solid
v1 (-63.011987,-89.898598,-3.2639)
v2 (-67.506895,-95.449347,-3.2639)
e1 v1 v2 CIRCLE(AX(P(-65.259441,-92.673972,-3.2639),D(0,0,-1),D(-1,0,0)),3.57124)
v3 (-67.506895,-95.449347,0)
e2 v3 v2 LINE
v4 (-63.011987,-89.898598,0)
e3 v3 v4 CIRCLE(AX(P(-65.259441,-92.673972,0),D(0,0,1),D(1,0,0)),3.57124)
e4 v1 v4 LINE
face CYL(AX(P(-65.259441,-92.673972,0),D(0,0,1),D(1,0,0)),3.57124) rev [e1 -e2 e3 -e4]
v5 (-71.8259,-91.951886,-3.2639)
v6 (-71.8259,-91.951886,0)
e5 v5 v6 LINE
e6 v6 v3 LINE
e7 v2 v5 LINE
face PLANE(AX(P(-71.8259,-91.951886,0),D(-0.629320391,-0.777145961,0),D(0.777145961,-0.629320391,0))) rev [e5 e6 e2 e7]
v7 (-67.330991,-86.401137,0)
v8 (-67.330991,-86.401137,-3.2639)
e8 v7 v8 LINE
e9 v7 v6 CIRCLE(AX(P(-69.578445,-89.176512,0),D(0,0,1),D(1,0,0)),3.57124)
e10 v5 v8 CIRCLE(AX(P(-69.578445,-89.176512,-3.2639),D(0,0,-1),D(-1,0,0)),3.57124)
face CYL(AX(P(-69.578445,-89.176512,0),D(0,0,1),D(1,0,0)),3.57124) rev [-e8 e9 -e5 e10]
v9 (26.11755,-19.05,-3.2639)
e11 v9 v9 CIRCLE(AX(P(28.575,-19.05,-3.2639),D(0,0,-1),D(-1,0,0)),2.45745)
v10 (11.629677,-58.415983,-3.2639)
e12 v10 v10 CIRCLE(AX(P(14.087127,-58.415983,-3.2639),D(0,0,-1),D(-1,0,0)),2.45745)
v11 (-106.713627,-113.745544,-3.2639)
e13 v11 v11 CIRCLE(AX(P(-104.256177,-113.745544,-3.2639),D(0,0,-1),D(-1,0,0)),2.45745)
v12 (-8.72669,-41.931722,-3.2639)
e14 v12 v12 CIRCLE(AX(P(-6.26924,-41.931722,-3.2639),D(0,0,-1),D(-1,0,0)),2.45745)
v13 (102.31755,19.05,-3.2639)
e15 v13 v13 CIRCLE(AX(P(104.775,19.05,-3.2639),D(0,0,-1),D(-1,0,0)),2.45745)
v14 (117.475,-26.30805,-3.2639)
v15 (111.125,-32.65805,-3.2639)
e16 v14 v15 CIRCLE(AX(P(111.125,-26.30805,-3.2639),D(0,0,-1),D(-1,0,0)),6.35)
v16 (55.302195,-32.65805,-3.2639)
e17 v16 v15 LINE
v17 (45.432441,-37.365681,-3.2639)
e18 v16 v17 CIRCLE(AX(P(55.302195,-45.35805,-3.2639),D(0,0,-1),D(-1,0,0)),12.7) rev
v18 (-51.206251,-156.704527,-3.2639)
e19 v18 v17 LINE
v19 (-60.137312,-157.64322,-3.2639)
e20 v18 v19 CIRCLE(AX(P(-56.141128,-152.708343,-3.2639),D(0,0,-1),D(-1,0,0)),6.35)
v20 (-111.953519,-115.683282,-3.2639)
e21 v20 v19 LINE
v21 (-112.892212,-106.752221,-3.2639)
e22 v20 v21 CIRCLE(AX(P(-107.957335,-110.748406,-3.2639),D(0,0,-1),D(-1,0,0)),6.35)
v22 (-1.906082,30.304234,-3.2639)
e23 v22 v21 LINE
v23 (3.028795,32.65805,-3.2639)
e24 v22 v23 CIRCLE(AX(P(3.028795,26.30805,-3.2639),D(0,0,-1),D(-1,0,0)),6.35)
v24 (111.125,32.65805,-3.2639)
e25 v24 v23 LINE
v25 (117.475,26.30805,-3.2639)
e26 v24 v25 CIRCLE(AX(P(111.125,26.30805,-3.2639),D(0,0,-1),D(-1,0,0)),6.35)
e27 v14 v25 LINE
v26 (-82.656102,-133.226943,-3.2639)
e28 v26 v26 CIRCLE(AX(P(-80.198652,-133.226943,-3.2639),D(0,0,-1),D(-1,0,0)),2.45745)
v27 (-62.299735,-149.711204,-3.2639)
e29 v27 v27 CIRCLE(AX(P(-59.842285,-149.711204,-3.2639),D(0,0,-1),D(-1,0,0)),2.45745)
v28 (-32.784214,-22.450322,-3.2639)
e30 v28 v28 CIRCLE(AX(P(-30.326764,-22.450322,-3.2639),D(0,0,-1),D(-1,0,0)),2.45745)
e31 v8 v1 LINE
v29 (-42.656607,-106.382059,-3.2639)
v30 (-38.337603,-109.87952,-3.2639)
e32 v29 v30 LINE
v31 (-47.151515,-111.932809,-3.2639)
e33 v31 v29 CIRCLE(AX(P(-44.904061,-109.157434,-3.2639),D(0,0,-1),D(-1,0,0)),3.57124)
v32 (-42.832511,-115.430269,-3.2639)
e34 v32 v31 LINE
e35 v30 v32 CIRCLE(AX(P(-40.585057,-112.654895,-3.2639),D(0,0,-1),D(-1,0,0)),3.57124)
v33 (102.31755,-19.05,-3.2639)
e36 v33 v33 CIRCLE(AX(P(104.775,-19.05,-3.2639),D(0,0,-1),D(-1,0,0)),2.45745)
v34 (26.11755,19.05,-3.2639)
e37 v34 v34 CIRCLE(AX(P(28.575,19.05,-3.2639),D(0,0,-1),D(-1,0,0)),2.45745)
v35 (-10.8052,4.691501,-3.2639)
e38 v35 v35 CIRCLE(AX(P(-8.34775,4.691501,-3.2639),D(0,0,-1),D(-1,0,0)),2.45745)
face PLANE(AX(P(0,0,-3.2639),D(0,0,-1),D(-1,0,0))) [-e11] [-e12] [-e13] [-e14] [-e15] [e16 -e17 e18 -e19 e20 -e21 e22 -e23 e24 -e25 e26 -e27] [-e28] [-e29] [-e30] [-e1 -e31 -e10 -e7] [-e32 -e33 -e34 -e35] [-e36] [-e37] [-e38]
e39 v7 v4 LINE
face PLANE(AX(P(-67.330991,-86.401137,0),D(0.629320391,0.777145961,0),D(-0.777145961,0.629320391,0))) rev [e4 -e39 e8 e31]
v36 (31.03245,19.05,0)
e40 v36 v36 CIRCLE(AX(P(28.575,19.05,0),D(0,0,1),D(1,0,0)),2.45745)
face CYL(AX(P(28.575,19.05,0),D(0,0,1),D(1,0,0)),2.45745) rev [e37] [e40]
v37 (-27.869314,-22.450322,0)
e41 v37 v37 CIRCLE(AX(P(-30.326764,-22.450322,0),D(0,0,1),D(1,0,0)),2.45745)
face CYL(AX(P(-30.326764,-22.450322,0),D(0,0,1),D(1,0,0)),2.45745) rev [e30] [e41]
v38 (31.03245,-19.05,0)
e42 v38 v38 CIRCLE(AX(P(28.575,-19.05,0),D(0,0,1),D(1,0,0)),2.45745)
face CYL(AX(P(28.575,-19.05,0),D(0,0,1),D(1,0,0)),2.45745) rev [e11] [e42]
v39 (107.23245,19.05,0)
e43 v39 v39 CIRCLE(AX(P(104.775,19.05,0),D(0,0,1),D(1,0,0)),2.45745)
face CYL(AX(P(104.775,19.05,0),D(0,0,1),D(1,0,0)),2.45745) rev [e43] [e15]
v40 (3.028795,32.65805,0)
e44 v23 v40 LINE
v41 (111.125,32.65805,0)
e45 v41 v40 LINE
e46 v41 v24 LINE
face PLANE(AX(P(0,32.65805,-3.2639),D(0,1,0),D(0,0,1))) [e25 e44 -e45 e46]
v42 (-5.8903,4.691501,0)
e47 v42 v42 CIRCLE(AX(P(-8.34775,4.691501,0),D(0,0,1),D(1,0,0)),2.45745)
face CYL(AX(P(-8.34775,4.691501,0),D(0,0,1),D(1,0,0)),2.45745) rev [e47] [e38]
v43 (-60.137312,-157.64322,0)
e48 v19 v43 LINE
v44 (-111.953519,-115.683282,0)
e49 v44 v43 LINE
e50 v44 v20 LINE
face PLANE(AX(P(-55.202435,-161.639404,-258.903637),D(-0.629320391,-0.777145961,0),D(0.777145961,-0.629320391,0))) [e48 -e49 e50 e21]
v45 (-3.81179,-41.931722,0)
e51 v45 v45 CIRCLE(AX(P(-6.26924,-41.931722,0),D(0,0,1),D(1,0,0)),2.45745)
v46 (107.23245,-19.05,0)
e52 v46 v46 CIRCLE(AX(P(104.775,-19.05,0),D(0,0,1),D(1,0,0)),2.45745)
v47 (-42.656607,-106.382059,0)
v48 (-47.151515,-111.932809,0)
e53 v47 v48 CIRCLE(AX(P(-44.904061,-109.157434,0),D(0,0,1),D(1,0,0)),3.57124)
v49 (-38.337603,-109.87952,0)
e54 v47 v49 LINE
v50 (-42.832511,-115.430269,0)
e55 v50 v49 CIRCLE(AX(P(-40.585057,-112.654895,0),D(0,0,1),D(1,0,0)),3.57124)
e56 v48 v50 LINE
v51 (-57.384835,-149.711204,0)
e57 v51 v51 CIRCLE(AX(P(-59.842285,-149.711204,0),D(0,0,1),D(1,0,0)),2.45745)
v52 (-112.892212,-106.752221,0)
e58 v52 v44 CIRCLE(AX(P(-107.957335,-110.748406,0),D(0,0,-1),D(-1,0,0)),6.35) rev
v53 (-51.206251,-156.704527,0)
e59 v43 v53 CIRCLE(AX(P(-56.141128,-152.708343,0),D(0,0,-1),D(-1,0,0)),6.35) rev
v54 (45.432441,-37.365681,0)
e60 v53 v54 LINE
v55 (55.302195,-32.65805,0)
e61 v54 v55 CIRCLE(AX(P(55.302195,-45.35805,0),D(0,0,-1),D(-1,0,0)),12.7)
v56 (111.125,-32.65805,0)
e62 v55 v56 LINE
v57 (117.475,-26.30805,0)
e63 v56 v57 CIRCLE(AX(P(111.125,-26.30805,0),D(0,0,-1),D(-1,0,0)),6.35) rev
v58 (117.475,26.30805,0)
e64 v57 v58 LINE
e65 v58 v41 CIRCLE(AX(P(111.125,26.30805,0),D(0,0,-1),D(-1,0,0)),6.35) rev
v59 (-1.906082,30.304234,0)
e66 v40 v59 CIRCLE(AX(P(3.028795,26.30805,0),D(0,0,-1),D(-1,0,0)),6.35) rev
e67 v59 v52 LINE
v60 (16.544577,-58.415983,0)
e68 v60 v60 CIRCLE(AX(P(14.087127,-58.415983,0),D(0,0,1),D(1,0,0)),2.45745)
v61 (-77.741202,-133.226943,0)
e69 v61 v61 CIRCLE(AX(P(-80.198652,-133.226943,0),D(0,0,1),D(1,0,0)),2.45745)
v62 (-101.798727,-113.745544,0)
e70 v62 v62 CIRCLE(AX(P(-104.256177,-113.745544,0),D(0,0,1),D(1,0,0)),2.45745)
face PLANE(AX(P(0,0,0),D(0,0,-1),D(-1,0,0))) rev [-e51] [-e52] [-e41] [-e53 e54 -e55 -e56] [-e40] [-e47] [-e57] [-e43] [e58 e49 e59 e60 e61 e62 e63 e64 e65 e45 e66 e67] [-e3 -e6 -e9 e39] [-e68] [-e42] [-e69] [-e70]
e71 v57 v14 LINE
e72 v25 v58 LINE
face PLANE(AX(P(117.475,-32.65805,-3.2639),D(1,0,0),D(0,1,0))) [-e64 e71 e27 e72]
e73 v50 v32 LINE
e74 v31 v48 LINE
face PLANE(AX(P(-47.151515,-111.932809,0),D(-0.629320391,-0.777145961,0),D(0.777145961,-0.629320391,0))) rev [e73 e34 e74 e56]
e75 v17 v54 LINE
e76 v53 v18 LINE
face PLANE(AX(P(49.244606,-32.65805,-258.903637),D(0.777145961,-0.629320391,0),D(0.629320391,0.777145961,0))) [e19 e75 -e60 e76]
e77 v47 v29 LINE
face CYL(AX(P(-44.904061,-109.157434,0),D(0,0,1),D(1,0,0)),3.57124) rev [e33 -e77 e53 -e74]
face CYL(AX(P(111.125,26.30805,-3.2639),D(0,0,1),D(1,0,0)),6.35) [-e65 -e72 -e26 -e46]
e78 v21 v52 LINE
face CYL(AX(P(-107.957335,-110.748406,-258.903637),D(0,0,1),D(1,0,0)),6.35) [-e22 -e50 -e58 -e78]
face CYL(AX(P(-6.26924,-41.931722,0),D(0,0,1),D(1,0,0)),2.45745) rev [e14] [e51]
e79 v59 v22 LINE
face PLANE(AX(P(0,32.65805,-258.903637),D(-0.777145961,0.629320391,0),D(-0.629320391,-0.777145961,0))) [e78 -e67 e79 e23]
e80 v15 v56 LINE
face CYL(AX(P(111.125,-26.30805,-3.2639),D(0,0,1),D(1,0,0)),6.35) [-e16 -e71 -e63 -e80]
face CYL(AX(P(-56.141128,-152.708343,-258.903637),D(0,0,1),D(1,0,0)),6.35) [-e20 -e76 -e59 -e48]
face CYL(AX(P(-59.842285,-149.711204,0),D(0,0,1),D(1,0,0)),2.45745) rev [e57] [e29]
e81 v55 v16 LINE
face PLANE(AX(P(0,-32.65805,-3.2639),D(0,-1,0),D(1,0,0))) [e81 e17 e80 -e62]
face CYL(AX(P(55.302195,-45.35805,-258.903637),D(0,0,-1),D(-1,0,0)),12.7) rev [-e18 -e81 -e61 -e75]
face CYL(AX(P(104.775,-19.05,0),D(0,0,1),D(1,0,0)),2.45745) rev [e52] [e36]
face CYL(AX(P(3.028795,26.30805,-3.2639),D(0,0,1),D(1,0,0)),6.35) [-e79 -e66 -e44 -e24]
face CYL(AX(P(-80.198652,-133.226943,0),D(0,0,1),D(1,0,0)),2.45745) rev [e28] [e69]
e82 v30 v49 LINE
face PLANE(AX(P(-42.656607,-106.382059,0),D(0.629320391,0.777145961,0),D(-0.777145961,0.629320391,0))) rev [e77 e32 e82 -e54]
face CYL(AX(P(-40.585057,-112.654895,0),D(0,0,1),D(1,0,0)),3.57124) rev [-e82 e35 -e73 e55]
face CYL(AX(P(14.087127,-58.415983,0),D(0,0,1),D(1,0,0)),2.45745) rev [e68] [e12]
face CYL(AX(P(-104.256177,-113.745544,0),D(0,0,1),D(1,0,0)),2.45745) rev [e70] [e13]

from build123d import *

# Parameters (mm, degrees)
SKETCH1_W                    = 117.475
SKETCH1_H                    = 65.3161
BASE_FLANGE1_DEPTH           = 3.2639
F_10_0_1935_DIAMETER_HOLE1_D = 4.9149
BOSS_EXTRUDE1_DEPTH          = 3.2639
F_1_4_START                  = -3.2639
F_1_4_CLEARANCE_SLOT1_DEPTH  = 3.2639
F_10_0_1935_DIAMETER_HOLE2_D = 4.9149
FILLET1_R                    = 6.35
FILLET2_R                    = 12.7


# Read off the part's stored shape, not the designer's step: 1/4 Clearance Slot1
# Sheet-metal steps are written as plain solids
with BuildPart() as part:
    # Sketch1 → Base-Flange1 (new body)
    with BuildSketch(Plane.XY):
        with Locations((58.7375, 0)):
            Rectangle(SKETCH1_W, SKETCH1_H)
    extrude(amount=-BASE_FLANGE1_DEPTH)

    # #10 (0.1935) Diameter Hole1 (through all)
    with Locations(Plane.XY):
        with Locations((28.575, 19.05), (28.575, -19.05), (104.775, 19.05), (104.775, -19.05)):
            Hole(F_10_0_1935_DIAMETER_HOLE1_D / 2)

    # Sketch8 → Boss-Extrude1 (add)
    with BuildSketch(Plane.XY):
        Polygon((0, 32.65805), (-116.888396133, -111.687098016), (-55.202435442, -161.639404056), (49.244605652, -32.65805), (0, -32.65805), align=None)
    extrude(amount=-BOSS_EXTRUDE1_DEPTH)

    # 1/4 Clearance Slot1 outline → 1/4 Clearance Slot1 (cut)
    with BuildSketch(Plane.XY.offset(F_1_4_START)):
        with BuildLine():
            Line((-71.825899608, -91.951886399), (-67.506895384, -95.449347058))
            ThreePointArc((-67.506895384, -95.449347058), (-62.484066487, -94.921426468), (-63.011987077, -89.898597571))
            Line((-63.011987077, -89.898597571), (-67.330991301, -86.401136912))
            ThreePointArc((-67.330991301, -86.401136912), (-72.353820198, -86.929057502), (-71.825899608, -91.951886399))
        make_face()
        with BuildLine():
            ThreePointArc((-42.832511108, -115.430269474), (-37.809682211, -114.902348884), (-38.337602801, -109.879519987))
            Line((-38.337602801, -109.879519987), (-42.656607025, -106.382059328))
            ThreePointArc((-42.656607025, -106.382059328), (-47.679435921, -106.909979918), (-47.151515331, -111.932808814))
            Line((-47.151515331, -111.932808814), (-42.832511108, -115.430269474))
        make_face()
    extrude(amount=F_1_4_CLEARANCE_SLOT1_DEPTH, mode=Mode.SUBTRACT)

    # #10 (0.1935) Diameter Hole2 (through all)
    with Locations(Plane.XY):
        with Locations((-30.326764214, -22.450322184), (-104.256177153, -113.745544006), (14.087127483, -58.415982533), (-59.842285455, -149.711204355), (-6.269239545, -41.93172154), (-80.198652483, -133.226943362), (-8.347749557, 4.69150052)):
            Hole(F_10_0_1935_DIAMETER_HOLE2_D / 2)

    # Fillet1
    fillet1_edges = [part.edges().sort_by_distance(p)[0] for p in [
        (-116.888396133, -111.687098016, -1.63195),
        (-55.202435442, -161.639404056, -1.63195),
        (0, 32.65805, -1.63195),
        (117.475, 32.65805, -1.63195),
        (117.475, -32.65805, -1.63195),
    ]]
    fillet(fillet1_edges, radius=FILLET1_R)

    # Fillet2
    fillet2_edges = [part.edges().sort_by_distance(p)[0] for p in [
        (49.244605652, -32.65805, -1.63195),
    ]]
    fillet(fillet2_edges, radius=FILLET2_R)


solid = part.part
